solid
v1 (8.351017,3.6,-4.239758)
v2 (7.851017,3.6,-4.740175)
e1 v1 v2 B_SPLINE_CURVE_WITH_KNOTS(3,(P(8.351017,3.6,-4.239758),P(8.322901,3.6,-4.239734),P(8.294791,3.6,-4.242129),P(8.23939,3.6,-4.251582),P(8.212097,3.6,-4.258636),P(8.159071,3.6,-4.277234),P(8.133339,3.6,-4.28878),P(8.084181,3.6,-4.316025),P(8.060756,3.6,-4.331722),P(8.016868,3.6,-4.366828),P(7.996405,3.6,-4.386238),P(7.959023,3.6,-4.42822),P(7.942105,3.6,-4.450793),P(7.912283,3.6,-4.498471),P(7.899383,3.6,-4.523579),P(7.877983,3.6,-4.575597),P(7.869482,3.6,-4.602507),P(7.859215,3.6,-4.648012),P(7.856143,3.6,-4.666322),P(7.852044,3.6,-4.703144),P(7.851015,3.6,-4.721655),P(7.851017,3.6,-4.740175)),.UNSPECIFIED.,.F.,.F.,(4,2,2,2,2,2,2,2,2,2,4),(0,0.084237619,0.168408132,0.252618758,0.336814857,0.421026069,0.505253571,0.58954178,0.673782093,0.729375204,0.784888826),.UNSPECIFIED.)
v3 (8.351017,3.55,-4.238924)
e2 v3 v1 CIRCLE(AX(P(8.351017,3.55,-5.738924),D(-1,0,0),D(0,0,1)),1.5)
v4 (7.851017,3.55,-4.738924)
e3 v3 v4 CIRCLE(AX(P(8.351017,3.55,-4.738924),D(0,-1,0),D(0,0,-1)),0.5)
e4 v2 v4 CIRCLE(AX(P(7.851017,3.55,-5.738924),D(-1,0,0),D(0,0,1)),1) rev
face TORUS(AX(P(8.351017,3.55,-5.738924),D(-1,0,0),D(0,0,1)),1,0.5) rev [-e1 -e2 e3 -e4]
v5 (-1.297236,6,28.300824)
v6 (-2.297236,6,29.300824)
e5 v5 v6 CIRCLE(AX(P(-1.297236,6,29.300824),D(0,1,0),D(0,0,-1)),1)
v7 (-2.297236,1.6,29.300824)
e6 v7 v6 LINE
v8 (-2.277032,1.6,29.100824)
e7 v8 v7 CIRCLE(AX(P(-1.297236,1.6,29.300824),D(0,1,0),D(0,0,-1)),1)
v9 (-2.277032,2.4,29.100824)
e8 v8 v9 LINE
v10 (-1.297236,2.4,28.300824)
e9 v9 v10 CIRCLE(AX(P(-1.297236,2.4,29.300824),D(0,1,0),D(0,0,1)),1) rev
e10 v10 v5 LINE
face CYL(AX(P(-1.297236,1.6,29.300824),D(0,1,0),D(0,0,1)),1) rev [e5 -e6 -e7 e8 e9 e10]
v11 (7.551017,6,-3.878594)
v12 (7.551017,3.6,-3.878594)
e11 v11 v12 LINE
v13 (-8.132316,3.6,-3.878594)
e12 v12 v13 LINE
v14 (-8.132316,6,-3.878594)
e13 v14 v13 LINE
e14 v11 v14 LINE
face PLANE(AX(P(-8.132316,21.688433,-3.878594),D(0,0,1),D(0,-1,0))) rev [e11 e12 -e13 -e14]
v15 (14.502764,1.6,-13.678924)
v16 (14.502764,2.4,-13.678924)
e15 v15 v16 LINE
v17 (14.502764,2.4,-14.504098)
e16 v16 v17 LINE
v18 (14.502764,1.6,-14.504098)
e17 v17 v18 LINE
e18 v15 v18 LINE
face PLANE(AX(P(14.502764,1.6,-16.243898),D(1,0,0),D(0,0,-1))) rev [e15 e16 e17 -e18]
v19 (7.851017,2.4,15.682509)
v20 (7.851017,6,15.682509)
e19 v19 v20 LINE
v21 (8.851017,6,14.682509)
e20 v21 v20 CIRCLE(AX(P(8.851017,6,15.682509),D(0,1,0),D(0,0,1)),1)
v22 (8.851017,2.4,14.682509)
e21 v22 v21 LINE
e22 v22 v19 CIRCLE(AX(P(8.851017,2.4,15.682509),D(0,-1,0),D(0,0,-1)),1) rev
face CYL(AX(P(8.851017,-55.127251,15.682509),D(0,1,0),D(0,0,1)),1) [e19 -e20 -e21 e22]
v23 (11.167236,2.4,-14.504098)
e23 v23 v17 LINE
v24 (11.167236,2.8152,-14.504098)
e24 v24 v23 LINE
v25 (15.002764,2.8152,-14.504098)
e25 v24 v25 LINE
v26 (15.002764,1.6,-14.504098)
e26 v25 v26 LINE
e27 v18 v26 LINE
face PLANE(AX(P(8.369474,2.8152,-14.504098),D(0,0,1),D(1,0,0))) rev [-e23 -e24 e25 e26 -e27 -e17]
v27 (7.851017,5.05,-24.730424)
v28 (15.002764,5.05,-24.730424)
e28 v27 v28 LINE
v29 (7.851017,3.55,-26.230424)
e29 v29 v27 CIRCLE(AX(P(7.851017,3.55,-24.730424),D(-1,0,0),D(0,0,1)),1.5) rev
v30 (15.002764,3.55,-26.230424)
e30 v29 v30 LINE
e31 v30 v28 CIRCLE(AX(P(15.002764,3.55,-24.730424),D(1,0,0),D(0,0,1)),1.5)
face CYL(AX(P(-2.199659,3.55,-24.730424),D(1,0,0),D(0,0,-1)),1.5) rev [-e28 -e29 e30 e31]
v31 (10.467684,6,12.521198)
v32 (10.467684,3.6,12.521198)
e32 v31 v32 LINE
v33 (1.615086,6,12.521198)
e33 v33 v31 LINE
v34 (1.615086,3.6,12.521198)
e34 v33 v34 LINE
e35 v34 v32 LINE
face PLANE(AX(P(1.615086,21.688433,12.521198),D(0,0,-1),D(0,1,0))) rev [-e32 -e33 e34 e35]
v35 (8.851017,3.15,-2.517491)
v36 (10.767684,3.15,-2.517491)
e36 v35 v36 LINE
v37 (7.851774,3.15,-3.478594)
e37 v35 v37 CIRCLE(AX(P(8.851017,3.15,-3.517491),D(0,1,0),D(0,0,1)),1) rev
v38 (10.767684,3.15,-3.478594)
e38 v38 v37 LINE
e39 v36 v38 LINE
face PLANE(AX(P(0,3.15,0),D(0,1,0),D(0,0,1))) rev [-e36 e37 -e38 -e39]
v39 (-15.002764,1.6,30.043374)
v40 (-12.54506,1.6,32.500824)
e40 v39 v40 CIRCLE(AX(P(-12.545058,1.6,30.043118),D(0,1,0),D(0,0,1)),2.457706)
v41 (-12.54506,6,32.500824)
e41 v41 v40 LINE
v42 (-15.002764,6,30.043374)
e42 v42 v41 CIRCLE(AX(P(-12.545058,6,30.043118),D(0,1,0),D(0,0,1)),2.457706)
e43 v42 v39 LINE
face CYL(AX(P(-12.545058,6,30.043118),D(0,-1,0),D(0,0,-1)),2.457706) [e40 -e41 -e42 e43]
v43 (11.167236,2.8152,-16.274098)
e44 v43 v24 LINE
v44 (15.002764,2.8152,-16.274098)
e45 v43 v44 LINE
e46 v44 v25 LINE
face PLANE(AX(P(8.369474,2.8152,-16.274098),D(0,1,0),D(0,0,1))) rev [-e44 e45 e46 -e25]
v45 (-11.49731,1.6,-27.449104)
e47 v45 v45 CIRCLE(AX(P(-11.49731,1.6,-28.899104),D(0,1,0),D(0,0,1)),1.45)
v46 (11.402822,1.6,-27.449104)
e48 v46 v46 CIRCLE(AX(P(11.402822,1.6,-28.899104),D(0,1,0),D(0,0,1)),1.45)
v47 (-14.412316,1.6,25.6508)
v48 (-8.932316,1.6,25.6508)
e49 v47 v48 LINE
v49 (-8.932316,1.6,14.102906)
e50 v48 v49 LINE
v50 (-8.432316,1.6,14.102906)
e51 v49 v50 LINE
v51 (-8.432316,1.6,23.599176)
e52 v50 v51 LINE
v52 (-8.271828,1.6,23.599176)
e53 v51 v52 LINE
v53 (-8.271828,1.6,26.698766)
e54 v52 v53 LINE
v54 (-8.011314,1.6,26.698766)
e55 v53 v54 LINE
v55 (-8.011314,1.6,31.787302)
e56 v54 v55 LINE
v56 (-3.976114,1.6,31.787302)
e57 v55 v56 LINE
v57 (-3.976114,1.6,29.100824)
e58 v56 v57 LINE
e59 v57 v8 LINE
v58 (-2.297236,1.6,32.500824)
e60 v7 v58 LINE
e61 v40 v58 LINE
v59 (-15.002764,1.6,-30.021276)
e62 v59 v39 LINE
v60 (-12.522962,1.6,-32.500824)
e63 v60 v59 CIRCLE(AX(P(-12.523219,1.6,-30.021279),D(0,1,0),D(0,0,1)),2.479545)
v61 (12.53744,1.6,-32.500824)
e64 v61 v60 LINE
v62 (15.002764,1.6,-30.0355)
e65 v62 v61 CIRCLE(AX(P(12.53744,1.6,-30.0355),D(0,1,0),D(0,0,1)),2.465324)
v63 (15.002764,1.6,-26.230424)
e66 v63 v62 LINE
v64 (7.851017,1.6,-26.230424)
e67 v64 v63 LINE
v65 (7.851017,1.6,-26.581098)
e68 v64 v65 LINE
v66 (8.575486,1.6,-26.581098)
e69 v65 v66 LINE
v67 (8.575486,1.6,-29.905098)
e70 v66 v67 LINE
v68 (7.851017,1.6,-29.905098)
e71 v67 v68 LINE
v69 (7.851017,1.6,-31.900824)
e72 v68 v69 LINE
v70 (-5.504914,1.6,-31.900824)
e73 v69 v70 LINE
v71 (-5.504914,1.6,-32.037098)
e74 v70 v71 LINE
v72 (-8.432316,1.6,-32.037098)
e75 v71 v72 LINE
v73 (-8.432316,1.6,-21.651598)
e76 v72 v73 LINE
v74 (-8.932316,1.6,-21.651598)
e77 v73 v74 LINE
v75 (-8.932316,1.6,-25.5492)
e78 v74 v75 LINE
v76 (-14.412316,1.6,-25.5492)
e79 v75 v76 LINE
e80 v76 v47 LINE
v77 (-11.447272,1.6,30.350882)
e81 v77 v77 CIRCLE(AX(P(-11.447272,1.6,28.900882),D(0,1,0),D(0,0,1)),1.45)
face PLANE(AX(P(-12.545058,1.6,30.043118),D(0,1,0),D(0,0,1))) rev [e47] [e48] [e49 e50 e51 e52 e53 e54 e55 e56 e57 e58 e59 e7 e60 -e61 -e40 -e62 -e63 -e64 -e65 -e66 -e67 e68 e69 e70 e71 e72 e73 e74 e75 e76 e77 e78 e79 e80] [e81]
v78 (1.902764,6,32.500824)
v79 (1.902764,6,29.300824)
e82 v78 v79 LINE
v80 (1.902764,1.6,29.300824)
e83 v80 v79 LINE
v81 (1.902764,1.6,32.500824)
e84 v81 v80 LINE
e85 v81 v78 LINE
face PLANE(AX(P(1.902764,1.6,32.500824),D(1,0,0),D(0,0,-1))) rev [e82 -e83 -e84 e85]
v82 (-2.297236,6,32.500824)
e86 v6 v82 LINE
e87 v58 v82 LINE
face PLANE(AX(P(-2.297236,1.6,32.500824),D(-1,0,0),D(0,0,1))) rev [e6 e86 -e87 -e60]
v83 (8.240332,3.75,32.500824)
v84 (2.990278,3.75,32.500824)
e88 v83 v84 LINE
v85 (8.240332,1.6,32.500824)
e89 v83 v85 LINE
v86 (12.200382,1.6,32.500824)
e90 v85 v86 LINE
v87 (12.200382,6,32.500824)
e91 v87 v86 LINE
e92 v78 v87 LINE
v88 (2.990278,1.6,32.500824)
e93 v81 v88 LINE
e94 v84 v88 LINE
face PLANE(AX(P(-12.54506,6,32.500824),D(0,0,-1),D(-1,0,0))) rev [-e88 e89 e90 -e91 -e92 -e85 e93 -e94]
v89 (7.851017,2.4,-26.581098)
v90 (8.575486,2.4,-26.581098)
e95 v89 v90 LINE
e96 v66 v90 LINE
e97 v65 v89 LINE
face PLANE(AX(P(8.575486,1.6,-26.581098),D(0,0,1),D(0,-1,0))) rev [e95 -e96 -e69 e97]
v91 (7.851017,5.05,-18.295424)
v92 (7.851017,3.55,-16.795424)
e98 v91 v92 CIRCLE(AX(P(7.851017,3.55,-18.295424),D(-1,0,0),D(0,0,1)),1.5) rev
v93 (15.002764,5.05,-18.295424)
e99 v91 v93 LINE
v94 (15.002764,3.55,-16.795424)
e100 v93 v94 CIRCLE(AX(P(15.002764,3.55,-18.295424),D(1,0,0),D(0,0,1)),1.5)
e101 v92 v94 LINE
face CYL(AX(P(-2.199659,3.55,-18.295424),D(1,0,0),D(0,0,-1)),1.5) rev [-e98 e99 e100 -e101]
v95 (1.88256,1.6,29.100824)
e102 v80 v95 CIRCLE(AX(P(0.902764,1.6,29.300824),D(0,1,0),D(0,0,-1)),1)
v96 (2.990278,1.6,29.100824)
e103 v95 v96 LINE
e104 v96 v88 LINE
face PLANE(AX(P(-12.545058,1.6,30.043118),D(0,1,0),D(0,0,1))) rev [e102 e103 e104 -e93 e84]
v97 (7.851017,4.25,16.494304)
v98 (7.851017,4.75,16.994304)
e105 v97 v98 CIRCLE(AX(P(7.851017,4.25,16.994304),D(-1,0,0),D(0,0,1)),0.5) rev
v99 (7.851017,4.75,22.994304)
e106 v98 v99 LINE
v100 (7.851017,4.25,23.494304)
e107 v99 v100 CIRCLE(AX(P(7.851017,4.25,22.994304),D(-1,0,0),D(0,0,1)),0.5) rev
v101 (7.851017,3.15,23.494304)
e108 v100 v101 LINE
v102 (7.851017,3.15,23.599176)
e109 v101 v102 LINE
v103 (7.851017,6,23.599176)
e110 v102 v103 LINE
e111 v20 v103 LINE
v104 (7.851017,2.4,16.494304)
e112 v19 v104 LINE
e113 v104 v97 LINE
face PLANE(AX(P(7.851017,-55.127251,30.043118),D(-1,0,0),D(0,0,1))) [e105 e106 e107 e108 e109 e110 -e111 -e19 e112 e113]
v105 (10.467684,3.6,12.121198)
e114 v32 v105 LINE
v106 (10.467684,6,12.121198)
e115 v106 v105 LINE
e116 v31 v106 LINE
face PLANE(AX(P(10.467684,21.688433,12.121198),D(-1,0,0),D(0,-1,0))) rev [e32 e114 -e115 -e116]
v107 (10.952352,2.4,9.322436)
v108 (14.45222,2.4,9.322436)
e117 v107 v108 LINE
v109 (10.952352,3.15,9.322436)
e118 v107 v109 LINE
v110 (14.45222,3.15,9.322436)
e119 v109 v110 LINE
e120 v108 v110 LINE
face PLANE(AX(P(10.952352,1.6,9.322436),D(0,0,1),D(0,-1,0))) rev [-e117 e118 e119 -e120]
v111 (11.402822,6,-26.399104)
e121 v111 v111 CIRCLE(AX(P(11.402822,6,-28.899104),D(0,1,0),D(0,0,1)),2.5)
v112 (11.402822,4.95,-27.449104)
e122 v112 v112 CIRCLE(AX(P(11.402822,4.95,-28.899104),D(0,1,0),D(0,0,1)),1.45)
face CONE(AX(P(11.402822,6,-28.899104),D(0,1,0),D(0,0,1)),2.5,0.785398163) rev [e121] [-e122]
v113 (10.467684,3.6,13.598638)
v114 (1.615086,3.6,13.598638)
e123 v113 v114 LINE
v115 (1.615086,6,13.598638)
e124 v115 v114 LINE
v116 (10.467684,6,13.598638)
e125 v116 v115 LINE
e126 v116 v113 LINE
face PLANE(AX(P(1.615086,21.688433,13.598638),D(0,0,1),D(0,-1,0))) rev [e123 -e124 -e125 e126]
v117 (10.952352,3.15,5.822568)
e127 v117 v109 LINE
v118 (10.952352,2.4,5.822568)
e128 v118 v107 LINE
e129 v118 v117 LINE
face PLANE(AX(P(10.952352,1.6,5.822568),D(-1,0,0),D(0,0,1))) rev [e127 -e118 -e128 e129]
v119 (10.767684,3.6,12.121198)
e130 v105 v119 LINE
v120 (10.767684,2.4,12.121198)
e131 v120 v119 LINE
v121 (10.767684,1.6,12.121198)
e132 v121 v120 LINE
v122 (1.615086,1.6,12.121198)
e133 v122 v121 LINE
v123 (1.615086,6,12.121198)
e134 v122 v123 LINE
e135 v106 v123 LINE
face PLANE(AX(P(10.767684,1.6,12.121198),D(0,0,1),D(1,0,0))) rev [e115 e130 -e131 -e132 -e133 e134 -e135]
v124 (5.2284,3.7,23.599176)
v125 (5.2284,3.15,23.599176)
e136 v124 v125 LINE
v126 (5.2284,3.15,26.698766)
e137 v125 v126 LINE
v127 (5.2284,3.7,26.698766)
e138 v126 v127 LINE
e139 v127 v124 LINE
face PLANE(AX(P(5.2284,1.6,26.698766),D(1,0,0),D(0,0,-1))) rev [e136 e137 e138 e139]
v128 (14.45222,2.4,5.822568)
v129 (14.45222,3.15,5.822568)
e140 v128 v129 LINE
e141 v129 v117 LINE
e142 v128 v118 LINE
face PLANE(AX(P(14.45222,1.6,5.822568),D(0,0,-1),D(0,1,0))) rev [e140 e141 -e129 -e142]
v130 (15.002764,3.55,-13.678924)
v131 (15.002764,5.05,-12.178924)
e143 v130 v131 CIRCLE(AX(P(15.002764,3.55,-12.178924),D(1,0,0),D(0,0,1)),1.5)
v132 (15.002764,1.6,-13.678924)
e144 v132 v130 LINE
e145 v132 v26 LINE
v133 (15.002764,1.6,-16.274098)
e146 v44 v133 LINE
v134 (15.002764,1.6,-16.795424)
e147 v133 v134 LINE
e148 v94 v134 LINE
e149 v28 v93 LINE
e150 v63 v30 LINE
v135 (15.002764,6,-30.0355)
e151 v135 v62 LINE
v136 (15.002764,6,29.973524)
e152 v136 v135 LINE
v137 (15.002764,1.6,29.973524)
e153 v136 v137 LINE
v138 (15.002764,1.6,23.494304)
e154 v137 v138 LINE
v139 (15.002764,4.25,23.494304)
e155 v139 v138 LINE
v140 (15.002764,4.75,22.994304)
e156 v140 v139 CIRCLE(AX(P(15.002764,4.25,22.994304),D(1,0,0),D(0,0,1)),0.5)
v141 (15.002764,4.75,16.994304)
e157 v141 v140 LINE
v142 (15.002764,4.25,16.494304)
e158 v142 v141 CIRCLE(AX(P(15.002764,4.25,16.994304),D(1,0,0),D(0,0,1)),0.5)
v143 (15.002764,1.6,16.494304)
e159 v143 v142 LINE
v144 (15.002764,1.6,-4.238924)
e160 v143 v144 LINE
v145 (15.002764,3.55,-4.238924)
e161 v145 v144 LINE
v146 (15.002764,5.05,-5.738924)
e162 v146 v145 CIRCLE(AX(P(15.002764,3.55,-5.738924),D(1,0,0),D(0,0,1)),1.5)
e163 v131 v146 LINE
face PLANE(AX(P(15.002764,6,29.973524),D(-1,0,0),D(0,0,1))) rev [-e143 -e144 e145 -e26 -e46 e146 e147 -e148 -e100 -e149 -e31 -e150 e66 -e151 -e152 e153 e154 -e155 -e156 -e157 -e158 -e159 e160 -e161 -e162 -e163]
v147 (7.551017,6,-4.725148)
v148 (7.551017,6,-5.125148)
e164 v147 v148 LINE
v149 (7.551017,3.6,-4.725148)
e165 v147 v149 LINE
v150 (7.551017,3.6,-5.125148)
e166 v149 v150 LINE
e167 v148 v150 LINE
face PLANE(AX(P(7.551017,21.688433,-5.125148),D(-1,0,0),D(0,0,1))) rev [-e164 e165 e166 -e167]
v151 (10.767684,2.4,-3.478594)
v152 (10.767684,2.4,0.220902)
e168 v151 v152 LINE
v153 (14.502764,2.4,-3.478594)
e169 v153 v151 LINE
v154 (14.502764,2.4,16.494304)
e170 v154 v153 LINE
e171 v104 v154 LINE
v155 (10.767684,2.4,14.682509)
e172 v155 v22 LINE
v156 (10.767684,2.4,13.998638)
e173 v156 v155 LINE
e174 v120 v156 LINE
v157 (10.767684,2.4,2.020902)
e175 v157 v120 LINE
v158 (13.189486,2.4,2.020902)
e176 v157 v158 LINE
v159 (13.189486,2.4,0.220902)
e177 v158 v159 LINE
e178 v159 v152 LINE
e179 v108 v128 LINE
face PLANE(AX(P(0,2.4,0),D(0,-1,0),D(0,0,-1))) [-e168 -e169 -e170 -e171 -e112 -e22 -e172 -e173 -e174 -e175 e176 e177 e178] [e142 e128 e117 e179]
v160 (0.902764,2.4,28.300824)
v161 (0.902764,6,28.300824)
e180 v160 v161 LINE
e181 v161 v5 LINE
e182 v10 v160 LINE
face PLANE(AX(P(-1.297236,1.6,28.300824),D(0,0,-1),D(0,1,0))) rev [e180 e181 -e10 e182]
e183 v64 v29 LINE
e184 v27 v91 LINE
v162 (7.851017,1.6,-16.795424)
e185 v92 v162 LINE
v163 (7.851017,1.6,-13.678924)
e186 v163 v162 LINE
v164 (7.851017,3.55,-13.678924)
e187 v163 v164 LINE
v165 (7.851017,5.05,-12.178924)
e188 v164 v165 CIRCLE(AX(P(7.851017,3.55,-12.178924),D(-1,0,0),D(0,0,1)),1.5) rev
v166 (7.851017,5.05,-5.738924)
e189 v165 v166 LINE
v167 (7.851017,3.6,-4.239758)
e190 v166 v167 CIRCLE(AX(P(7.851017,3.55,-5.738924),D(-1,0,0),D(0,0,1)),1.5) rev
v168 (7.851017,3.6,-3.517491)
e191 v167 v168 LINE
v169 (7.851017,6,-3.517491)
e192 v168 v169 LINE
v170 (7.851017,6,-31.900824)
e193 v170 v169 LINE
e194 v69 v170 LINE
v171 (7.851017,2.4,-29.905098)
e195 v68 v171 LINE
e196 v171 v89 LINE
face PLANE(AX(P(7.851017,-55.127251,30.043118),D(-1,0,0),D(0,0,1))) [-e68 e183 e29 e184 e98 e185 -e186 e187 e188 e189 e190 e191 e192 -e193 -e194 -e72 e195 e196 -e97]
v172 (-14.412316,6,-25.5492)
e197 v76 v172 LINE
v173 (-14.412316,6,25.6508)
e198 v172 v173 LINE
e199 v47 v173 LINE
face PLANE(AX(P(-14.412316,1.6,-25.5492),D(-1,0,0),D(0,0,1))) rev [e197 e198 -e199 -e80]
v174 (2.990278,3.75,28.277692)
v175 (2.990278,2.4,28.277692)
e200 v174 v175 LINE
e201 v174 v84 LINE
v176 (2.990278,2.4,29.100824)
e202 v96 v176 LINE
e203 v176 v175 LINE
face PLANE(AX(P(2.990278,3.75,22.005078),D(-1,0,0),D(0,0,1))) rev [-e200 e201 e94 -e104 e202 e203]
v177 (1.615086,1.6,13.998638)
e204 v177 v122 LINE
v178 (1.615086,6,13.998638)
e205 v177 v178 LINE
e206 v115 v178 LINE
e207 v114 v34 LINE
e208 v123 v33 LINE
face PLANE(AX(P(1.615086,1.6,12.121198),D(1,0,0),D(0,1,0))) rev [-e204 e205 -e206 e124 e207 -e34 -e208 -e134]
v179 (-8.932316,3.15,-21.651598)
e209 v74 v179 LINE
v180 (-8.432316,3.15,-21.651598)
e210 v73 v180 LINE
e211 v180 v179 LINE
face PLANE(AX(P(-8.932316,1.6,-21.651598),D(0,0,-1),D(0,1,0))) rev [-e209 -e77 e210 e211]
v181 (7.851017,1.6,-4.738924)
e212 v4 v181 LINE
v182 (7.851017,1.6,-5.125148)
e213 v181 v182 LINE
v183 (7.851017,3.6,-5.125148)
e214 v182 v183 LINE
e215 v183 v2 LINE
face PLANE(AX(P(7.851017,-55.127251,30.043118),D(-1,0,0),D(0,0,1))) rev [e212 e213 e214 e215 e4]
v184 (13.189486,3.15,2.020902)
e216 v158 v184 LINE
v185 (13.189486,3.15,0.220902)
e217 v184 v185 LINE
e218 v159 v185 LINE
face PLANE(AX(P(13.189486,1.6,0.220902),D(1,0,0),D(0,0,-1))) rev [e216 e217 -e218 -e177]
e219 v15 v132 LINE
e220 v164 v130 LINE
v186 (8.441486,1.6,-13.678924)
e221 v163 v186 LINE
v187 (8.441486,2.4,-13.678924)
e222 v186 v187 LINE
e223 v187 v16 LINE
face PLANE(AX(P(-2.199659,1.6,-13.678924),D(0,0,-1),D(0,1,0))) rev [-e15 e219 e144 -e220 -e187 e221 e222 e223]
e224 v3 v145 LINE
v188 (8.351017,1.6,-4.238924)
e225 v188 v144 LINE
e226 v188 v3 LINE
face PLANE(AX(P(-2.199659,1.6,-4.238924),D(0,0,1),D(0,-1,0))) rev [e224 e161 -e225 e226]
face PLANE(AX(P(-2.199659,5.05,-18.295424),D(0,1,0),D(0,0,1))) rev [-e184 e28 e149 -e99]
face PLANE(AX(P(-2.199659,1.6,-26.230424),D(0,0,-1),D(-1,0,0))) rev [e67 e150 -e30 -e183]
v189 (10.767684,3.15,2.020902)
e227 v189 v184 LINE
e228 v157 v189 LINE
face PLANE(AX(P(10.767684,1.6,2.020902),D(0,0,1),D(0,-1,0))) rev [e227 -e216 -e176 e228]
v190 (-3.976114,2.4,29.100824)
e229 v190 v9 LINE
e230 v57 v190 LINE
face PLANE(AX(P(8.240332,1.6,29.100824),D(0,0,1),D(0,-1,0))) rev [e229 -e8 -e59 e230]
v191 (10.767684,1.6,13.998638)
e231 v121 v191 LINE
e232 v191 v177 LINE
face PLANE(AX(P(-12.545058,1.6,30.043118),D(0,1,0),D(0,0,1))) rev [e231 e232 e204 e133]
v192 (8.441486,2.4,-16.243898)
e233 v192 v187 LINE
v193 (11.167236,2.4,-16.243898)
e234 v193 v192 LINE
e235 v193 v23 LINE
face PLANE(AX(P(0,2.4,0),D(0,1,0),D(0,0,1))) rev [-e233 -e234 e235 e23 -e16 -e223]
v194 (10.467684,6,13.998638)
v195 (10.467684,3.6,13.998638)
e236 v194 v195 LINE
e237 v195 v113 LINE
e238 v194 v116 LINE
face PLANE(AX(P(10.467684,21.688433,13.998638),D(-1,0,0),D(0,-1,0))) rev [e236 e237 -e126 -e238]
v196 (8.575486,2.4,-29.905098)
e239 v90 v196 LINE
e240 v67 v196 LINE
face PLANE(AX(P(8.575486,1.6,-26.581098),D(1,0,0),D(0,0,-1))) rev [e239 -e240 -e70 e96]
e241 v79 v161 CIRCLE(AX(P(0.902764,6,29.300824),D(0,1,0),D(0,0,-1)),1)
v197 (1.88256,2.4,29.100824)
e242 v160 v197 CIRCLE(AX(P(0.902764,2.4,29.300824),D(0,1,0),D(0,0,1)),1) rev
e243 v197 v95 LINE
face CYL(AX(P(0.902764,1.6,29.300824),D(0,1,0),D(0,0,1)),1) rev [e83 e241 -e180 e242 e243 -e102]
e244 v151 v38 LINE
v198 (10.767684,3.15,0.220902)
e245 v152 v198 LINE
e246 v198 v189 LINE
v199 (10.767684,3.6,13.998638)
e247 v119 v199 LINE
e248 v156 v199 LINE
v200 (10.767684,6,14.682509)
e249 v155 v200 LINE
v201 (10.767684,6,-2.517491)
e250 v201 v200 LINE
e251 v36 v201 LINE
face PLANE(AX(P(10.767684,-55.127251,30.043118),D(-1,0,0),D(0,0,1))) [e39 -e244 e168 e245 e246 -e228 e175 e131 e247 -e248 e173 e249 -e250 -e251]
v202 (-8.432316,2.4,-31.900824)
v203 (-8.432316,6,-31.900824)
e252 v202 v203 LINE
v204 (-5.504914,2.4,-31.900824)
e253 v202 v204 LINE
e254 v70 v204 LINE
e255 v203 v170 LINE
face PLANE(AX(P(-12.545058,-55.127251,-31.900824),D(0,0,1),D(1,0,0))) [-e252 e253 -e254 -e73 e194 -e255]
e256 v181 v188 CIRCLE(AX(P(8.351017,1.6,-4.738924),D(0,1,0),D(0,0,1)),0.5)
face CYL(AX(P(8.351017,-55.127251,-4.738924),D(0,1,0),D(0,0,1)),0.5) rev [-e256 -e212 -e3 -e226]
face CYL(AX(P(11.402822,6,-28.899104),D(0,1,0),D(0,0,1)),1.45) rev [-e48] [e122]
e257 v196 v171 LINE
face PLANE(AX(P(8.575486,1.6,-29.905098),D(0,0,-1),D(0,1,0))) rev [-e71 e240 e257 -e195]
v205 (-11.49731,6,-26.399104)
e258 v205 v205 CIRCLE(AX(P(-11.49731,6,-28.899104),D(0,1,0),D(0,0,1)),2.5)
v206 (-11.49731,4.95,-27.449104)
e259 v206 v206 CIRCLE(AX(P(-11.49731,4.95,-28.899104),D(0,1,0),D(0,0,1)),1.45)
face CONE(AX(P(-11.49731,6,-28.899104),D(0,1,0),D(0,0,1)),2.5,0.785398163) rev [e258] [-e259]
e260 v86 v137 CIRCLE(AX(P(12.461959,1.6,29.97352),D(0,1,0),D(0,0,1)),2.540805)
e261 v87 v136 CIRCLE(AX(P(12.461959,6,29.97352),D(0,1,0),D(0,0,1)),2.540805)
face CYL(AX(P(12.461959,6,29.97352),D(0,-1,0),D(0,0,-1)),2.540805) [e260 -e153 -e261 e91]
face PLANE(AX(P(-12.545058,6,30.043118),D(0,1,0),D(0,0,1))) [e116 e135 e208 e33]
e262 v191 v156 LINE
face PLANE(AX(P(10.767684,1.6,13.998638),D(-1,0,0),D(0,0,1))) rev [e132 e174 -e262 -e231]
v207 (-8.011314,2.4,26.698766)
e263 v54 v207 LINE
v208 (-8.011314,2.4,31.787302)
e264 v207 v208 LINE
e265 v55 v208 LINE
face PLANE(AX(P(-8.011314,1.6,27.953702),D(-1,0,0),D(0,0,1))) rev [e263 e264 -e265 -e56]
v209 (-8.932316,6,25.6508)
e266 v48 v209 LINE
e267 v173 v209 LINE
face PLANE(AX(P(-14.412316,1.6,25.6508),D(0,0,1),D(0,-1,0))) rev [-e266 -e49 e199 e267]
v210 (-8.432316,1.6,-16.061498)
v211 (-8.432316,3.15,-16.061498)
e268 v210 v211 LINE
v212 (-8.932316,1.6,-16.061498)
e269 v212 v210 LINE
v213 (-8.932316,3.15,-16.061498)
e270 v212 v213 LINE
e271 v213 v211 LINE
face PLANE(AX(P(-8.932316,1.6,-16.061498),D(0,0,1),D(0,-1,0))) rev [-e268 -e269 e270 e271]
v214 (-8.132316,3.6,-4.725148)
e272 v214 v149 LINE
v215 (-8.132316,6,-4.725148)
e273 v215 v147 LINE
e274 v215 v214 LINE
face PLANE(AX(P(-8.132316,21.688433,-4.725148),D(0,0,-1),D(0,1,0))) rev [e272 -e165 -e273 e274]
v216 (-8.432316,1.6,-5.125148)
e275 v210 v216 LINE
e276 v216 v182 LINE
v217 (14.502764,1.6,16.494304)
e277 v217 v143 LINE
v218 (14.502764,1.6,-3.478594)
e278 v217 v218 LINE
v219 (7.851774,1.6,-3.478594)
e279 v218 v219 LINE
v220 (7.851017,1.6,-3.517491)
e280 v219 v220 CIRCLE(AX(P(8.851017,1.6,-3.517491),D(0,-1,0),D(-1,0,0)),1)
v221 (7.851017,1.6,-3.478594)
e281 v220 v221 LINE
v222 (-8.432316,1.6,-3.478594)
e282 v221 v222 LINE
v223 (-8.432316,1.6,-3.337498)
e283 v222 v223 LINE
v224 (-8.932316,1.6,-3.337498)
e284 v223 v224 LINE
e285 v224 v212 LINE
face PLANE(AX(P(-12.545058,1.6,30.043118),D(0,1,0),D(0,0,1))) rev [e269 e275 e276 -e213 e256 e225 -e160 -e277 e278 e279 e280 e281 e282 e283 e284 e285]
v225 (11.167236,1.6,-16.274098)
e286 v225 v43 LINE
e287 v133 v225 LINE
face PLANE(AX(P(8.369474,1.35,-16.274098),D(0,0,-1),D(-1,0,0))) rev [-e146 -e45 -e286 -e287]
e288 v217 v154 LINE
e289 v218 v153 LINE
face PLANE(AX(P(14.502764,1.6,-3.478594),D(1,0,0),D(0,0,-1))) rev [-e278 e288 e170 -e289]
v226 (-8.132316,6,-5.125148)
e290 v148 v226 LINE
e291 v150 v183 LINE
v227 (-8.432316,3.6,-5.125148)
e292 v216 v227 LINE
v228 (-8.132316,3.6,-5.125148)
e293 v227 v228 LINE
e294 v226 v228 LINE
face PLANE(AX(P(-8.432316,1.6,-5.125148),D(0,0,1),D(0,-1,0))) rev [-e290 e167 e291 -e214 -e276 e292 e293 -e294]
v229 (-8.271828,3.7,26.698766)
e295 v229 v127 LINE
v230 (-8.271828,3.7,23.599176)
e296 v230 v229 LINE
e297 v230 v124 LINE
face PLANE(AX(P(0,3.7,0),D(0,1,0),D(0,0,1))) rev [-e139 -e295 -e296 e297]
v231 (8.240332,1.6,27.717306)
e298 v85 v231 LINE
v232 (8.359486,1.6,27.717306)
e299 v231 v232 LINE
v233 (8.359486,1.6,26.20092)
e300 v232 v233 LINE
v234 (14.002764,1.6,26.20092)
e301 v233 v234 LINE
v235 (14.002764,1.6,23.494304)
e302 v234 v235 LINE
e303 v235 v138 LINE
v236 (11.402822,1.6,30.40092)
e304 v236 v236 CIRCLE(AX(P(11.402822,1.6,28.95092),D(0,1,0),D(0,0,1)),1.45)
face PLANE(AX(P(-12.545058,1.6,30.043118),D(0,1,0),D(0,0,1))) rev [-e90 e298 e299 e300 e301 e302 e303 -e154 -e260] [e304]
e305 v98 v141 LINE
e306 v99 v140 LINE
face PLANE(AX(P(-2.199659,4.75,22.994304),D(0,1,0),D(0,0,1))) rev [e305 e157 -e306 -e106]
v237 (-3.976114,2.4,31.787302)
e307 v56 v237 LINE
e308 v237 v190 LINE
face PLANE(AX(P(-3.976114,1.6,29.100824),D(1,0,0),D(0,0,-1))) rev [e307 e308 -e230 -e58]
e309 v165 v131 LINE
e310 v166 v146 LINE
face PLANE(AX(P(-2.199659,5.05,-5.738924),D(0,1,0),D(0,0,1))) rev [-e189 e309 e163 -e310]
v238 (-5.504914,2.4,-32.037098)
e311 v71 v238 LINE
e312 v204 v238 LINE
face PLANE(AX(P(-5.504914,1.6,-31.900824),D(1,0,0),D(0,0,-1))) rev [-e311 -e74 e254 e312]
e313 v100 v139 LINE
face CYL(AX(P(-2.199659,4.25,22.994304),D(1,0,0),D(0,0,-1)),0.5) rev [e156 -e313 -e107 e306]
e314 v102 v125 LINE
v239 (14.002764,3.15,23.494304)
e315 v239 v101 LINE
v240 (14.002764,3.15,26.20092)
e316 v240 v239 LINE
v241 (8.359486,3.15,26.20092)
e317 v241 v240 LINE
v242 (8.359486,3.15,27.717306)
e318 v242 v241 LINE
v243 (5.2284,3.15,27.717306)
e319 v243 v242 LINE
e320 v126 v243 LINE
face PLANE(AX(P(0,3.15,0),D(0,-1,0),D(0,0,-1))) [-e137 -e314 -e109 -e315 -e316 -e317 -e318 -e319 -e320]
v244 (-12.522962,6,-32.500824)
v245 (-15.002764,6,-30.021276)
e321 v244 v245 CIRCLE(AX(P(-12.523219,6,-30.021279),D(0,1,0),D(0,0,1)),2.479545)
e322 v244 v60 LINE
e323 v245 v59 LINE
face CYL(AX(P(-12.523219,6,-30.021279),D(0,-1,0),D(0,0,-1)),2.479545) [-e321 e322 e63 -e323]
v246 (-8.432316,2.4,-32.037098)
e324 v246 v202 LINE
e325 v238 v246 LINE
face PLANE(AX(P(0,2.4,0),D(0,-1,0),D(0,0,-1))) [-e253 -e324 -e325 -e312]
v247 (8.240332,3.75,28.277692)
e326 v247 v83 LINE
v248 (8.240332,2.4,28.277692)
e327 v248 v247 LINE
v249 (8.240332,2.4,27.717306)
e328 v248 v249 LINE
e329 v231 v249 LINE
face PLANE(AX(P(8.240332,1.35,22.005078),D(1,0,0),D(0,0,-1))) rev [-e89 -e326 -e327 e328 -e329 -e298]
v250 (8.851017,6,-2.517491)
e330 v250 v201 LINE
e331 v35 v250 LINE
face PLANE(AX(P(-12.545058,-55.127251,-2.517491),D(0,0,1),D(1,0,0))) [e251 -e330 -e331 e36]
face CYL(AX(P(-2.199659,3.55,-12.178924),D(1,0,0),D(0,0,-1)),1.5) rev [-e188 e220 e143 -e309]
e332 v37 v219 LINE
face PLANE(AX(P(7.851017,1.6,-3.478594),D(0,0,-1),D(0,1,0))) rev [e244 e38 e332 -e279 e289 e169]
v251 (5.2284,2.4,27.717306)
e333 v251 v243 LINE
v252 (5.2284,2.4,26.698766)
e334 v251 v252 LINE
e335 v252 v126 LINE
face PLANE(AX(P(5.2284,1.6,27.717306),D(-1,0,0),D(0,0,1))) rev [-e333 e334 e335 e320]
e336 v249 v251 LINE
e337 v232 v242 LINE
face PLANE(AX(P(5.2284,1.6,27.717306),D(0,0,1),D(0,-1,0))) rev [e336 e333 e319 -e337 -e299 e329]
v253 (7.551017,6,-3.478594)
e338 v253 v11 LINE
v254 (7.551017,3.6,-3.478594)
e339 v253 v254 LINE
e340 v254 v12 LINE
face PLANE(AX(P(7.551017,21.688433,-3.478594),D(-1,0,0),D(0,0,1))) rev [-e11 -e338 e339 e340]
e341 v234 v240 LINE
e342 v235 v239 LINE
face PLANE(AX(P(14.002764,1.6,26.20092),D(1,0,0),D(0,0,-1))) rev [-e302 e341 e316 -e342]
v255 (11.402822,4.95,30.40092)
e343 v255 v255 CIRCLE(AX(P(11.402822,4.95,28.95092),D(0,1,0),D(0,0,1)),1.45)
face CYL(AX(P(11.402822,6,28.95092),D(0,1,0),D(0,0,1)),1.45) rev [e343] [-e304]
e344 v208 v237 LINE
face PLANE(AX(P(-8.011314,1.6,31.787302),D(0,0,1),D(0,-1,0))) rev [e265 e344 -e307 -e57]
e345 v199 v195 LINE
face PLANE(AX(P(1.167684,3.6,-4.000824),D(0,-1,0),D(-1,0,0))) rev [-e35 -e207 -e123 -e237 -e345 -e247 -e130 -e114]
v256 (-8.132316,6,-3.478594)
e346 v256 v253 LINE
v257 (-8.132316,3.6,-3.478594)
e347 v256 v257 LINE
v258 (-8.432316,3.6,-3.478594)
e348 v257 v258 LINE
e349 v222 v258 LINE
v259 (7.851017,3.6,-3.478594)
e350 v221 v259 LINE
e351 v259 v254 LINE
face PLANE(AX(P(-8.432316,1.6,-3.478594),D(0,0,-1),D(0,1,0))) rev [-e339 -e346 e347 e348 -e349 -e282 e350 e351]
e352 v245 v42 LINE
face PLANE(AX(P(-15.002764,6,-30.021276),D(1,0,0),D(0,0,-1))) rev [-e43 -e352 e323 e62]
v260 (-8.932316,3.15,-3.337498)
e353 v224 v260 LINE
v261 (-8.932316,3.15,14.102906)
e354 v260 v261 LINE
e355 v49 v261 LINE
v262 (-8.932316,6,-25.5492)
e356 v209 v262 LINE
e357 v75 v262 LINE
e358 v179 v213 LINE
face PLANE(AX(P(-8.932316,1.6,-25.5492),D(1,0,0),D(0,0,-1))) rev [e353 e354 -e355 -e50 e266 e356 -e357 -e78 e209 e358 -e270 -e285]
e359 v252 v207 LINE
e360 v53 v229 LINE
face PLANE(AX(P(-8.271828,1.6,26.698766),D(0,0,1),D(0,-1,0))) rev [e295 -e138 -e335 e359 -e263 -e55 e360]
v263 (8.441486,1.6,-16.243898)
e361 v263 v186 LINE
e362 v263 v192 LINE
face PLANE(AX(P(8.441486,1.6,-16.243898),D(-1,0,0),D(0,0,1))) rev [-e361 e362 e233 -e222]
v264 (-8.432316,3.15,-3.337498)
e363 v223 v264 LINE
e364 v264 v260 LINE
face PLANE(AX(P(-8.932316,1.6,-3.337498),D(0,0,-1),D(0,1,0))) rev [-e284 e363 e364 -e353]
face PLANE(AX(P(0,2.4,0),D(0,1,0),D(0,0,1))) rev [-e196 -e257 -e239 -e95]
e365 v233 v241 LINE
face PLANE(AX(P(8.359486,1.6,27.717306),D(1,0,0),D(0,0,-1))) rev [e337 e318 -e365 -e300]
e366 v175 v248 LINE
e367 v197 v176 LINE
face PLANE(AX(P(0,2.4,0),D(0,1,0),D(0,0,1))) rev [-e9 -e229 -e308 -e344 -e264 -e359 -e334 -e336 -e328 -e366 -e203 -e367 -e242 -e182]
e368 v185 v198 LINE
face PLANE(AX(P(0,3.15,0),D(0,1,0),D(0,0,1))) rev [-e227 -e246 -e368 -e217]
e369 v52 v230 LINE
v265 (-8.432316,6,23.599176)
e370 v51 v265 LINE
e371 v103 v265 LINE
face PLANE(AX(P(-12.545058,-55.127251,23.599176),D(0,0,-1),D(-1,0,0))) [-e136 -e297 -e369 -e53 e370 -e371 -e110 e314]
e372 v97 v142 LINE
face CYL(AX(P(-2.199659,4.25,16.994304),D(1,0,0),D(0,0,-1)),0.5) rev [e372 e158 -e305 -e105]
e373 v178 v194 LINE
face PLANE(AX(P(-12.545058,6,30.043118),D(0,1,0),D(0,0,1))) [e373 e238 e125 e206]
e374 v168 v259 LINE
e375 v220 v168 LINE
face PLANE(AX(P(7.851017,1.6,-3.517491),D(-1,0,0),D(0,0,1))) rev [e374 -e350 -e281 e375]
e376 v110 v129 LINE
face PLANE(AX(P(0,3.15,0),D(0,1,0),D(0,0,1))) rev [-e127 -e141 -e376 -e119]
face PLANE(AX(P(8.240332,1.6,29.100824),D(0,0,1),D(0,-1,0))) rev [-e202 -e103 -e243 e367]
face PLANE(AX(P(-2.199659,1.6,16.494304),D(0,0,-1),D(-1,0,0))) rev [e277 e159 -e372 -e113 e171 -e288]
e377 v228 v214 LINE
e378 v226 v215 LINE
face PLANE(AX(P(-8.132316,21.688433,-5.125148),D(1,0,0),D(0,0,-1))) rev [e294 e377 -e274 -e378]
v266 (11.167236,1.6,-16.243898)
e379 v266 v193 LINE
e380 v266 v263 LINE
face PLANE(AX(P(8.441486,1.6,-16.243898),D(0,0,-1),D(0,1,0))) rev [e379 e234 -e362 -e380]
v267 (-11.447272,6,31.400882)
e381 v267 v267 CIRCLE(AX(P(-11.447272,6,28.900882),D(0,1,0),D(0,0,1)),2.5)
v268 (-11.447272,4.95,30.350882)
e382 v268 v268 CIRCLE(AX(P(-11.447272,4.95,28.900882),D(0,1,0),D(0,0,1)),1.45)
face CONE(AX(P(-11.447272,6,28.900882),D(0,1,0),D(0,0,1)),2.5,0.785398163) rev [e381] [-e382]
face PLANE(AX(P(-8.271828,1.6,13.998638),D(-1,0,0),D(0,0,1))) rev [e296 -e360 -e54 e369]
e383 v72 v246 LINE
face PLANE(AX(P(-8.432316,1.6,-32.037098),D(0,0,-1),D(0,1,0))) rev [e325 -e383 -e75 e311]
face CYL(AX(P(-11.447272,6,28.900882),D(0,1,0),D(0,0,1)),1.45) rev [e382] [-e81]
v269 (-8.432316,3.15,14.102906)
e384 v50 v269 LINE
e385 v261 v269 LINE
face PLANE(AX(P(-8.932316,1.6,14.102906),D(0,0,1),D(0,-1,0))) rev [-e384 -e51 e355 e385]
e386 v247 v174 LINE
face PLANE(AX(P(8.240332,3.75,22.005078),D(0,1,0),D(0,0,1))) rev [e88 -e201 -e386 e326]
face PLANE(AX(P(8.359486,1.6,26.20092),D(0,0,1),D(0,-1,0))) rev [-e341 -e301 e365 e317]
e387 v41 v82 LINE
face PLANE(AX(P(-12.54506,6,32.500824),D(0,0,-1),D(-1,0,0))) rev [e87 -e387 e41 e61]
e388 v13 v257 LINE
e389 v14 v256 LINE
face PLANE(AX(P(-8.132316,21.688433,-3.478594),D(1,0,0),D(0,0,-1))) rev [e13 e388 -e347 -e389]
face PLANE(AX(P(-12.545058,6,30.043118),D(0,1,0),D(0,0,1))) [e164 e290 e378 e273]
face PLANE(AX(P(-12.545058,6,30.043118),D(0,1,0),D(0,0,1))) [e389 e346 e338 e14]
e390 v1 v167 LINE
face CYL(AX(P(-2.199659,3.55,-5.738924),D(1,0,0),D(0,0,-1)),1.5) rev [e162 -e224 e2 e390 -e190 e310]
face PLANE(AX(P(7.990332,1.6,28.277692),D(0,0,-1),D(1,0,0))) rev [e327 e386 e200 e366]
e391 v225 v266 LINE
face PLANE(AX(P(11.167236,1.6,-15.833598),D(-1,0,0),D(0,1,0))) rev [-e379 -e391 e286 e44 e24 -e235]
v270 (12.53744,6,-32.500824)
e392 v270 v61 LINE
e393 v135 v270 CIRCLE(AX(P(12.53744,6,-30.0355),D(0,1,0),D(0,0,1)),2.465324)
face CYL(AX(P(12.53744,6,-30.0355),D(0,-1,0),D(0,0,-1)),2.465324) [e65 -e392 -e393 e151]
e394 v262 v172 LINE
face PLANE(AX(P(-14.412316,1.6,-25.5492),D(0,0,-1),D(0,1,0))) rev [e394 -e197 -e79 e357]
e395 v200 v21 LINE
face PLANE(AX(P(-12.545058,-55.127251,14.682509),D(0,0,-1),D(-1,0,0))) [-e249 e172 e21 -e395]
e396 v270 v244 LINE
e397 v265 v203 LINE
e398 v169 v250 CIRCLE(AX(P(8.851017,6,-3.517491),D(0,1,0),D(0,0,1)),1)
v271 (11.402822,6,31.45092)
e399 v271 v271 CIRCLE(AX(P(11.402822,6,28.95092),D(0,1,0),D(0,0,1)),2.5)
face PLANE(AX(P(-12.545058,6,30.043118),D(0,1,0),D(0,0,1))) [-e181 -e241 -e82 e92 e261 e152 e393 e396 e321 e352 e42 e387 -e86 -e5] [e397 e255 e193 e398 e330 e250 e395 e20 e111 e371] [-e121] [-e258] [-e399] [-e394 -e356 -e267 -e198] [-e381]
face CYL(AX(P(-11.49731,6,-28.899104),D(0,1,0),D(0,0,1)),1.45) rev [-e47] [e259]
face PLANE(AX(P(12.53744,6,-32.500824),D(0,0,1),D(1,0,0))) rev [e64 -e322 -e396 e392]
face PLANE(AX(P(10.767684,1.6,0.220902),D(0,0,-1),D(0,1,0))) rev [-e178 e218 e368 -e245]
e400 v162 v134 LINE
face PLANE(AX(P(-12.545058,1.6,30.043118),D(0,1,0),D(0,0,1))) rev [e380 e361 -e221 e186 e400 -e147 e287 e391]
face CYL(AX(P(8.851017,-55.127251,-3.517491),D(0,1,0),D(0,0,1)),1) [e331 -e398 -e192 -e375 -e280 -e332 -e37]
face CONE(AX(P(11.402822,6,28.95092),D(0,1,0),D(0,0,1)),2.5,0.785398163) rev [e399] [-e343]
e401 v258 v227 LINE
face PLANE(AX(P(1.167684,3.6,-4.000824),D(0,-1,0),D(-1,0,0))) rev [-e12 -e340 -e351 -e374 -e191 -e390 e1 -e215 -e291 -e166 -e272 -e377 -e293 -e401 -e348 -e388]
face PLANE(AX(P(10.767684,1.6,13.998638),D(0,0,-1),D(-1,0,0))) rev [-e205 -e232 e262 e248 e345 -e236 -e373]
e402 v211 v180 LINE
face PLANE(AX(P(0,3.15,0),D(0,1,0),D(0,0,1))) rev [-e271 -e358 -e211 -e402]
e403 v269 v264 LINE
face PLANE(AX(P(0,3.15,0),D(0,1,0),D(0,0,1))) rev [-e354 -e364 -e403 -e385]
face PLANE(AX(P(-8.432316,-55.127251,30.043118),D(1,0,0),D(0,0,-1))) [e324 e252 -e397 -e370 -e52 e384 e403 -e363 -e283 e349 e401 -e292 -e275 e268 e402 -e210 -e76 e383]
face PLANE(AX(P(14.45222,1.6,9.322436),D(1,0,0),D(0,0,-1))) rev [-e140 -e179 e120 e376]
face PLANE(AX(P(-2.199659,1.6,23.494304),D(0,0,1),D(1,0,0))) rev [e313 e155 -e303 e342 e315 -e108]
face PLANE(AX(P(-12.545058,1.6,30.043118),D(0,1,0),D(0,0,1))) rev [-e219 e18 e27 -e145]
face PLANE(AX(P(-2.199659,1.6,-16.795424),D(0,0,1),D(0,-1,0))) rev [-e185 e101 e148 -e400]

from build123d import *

# Parameters (mm, degrees)
BOSS_EXTRUDE1_DEPTH                                  = 4.4
CUT_EXTRUDE1_START                                   = 6
CUT_EXTRUDE1_DEPTH                                   = 2.4
CUT_EXTRUDE2_DEPTH                                   = 37.078029775
CUT_EXTRUDE2_DEPTH_BACK                              = 37.078029775
SKETCH3_W                                            = 5.48
SKETCH3_H                                            = 51.2
SKETCH10_W                                           = 16.283333333
SKETCH10_H                                           = 26.775676
CUT_EXTRUDE3_DEPTH                                   = 36.889054494
CUT_EXTRUDE4_DEPTH                                   = 7.151746667
CUT_EXTRUDE5_START                                   = 0.1
SKETCH12_W                                           = 13.500228
SKETCH12_H                                           = 12.700128
CUT_EXTRUDE5_DEPTH                                   = 36.989054494
CUT_EXTRUDE6_START                                   = 0.2
SKETCH13_W                                           = 0.5
SKETCH13_H                                           = 17.440404
SKETCH13_H_2                                         = 5.5901
SKETCH13_W_2                                         = 2.916666667
SKETCH13_H_3                                         = 0.961103333
SKETCH13_W_3                                         = 2.421802
SKETCH13_H_4                                         = 1.8
SKETCH13_W_4                                         = 3.499868
SKETCH13_H_5                                         = 3.499868
CUT_EXTRUDE6_DEPTH                                   = 37.138374093
SKETCH14_W                                           = 5.250054
SKETCH14_H                                           = 2.4
CUT_EXTRUDE7_DEPTH                                   = 4.223132
CUT_EXTRUDE8_DEPTH                                   = 37.078029775
CUT_EXTRUDE9_START                                   = 0.2
SKETCH16_W                                           = 2.927402
SKETCH16_H                                           = 0.136274
SKETCH16_W_2                                         = 0.724468667
SKETCH16_H_2                                         = 3.324
SKETCH16_W_3                                         = 6.061278
SKETCH16_H_3                                         = 2.564974001
CUT_EXTRUDE9_DEPTH                                   = 37.209779678
FILLET1_R                                            = 0.5
SKETCH17_W                                           = 1.77
SKETCH17_H                                           = 1.4652
CUT_EXTRUDE10_DEPTH                                  = 3.835528
SKETCH18_W                                           = 8.852598
SKETCH18_H                                           = 0.4
SKETCH18_W_2                                         = 15.683333333
BOSS_EXTRUDE2_DEPTH                                  = 2.4
CSK_FOR_M2_5_SLOTTED_RAISED_CTSK_HEAD_SC_D           = 2.9
CSK_FOR_M2_5_SLOTTED_RAISED_CTSK_HEAD_SC_CSINK_D     = 5
CSK_FOR_M2_5_SLOTTED_RAISED_CTSK_HEAD_SC_CSINK_ANGLE = 90


with BuildPart() as part:
    # Sketch1 → Boss-Extrude1 (new body)
    with BuildSketch(Plane(origin=(0, 1.6, 0), x_dir=(1, 0, 0), z_dir=(0, 1, 0))):
        with BuildLine():
            Line((-15.002764, 30.021276), (-15.002764, -30.043374))
            ThreePointArc((-15.002764, -30.043374), (-14.282828873, -31.781068474), (-12.54506, -32.500824))
            Line((-12.54506, -32.500824), (12.200382, -32.500824))
            ThreePointArc((12.200382, -32.500824), (14.163585126, -31.860357898), (15.002764, -29.973524))
            Line((15.002764, -29.973524), (15.002764, 30.0355))
            ThreePointArc((15.002764, 30.0355), (14.280687318, 31.778747318), (12.53744, 32.500824))
            Line((12.53744, 32.500824), (-12.522962, 32.500824))
            ThreePointArc((-12.522962, 32.500824), (-14.276432231, 31.77467184), (-15.002764, 30.021276))
        make_face()
    extrude(amount=BOSS_EXTRUDE1_DEPTH)

    # Sketch2 → Cut-Extrude1 (cut)
    with BuildSketch(Plane(origin=(0, 0, 0), x_dir=(1, 0, 0), z_dir=(0, 1, 0)).offset(CUT_EXTRUDE1_START)):
        with BuildLine():
            Line((-8.432316, 31.600824), (-8.432316, 31.900824))
            Line((-8.432316, 31.900824), (7.851017333, 31.900824))
            Line((7.851017333, 31.900824), (7.851017333, 31.600824))
            Line((7.851017333, 31.600824), (7.851017333, 3.517490667))
            ThreePointArc((7.851017333, 3.517490667), (8.143910552, 2.810383885), (8.851017333, 2.517490667))
            Line((8.851017333, 2.517490667), (10.767684, 2.517490667))
            Line((10.767684, 2.517490667), (10.767684, -14.682509333))
            Line((10.767684, -14.682509333), (8.851017333, -14.682509333))
            ThreePointArc((8.851017333, -14.682509333), (8.143910552, -14.975402552), (7.851017333, -15.682509333))
            Line((7.851017333, -15.682509333), (7.851017333, -23.599176))
            Line((7.851017333, -23.599176), (-8.432316, -23.599176))
            Line((-8.432316, -23.599176), (-8.432316, 31.600824))
        make_face()
    extrude(amount=-CUT_EXTRUDE1_DEPTH, mode=Mode.SUBTRACT)

    # Sketch3 → Cut-Extrude2 (cut, two sides: drawn at the far end of the back side and taken through both)
    with BuildSketch(Plane(origin=(0, 6, 0), x_dir=(1, 0, 0), z_dir=(0, 1, 0)).offset(-CUT_EXTRUDE2_DEPTH_BACK)):
        with Locations((-11.672316, -0.0508)):
            Rectangle(SKETCH3_W, SKETCH3_H)
    extrude(amount=CUT_EXTRUDE2_DEPTH + CUT_EXTRUDE2_DEPTH_BACK, mode=Mode.SUBTRACT)

    # Sketch10 → Cut-Extrude3 (cut, through all)
    with BuildSketch(Plane(origin=(0, 3.6, 0), x_dir=(1, 0, 0), z_dir=(0, 1, 0))):
        with Locations((-0.290649333, 18.512986)):
            Rectangle(SKETCH10_W, SKETCH10_H)
        with BuildLine():
            Line((-8.432316, 3.478594), (7.851017333, 3.478594))
            Line((7.851017333, 3.478594), (7.851017333, 3.517490667))
            ThreePointArc((7.851017333, 3.517490667), (8.143910552, 2.810383885), (8.851017333, 2.517490667))
            Line((8.851017333, 2.517490667), (10.767684, 2.517490667))
            Line((10.767684, 2.517490667), (10.767684, -12.121198))
            Line((10.767684, -12.121198), (1.615086, -12.121198))
            Line((1.615086, -12.121198), (1.615086, -13.998638))
            Line((1.615086, -13.998638), (10.767684, -13.998638))
            Line((10.767684, -13.998638), (10.767684, -14.682509333))
            Line((10.767684, -14.682509333), (8.851017333, -14.682509333))
            ThreePointArc((8.851017333, -14.682509333), (8.143910552, -14.975402552), (7.851017333, -15.682509333))
            Line((7.851017333, -15.682509333), (7.851017333, -23.599176))
            Line((7.851017333, -23.599176), (-8.432316, -23.599176))
            Line((-8.432316, -23.599176), (-8.432316, 3.478594))
        make_face()
    extrude(amount=-CUT_EXTRUDE3_DEPTH, mode=Mode.SUBTRACT)

    # Sketch11 → Cut-Extrude4 (cut)
    with BuildSketch(Plane(origin=(15.002764, 0, 0), x_dir=(0, 0, -1), z_dir=(1, 0, 0))):
        with BuildLine():
            Line((-23.494304, 1.6), (-16.494304, 1.6))
            Line((-16.494304, 1.6), (-16.494304, 4.25))
            ThreePointArc((-16.494304, 4.25), (-16.640750609, 4.603553391), (-16.994304, 4.75))
            Line((-16.994304, 4.75), (-22.994304, 4.75))
            ThreePointArc((-22.994304, 4.75), (-23.347857391, 4.603553391), (-23.494304, 4.25))
            Line((-23.494304, 4.25), (-23.494304, 1.6))
        make_face()
        with BuildLine():
            Line((4.238924, 1.6), (13.678923999, 1.6))
            Line((13.678923999, 1.6), (13.678923999, 3.55))
            ThreePointArc((13.678923999, 3.55), (13.239584171, 4.610660172), (12.178923999, 5.05))
            Line((12.178923999, 5.05), (5.738924, 5.05))
            ThreePointArc((5.738924, 5.05), (4.678263828, 4.610660172), (4.238924, 3.55))
            Line((4.238924, 3.55), (4.238924, 1.6))
        make_face()
        with BuildLine():
            Line((16.795424, 1.6), (26.230423999, 1.6))
            Line((26.230423999, 1.6), (26.230423999, 3.55))
            ThreePointArc((26.230423999, 3.55), (25.791084171, 4.610660172), (24.730423999, 5.05))
            Line((24.730423999, 5.05), (18.295424, 5.05))
            ThreePointArc((18.295424, 5.05), (17.234763828, 4.610660172), (16.795424, 3.55))
            Line((16.795424, 3.55), (16.795424, 1.6))
        make_face()
    extrude(amount=-CUT_EXTRUDE4_DEPTH, mode=Mode.SUBTRACT)

    # Sketch12 → Cut-Extrude5 (cut, through all)
    with BuildSketch(Plane(origin=(0, 3.6, 0), x_dir=(1, 0, 0), z_dir=(0, 1, 0)).offset(CUT_EXTRUDE5_START)):
        with Locations((-1.521714, -20.348702)):
            Rectangle(SKETCH12_W, SKETCH12_H)
    extrude(amount=-CUT_EXTRUDE5_DEPTH, mode=Mode.SUBTRACT)

    # Sketch13 → Cut-Extrude6 (cut, through all)
    with BuildSketch(Plane(origin=(0, 2.95, 0), x_dir=(1, 0, 0), z_dir=(0, 1, 0)).offset(CUT_EXTRUDE6_START)):
        with Locations((-8.682316, -5.382704)):
            Rectangle(SKETCH13_W, SKETCH13_H)
        Polygon((8.359486, -27.717306), (8.359486, -26.20092), (14.002764, -26.20092), (14.002764, -23.494304), (8.359486, -23.494304), (5.2284, -23.494304), (5.2284, -27.717306), align=None)
        with Locations((-8.682316, 18.856548)):
            Rectangle(SKETCH13_W, SKETCH13_H_2)
        with Locations((9.309350667, 2.998042333)):
            Rectangle(SKETCH13_W_2, SKETCH13_H_3)
        with Locations((11.978585, -1.120902)):
            Rectangle(SKETCH13_W_3, SKETCH13_H_4)
        with Locations((12.702286, -7.572502)):
            Rectangle(SKETCH13_W_4, SKETCH13_H_5)
    extrude(amount=-CUT_EXTRUDE6_DEPTH, mode=Mode.SUBTRACT)

    # Sketch14 → Cut-Extrude7 (cut)
    with BuildSketch(Plane.XY.offset(32.500824)):
        with Locations((5.615305, 2.55)):
            Rectangle(SKETCH14_W, SKETCH14_H)
    extrude(amount=-CUT_EXTRUDE7_DEPTH, mode=Mode.SUBTRACT)

    # Sketch15 → Cut-Extrude8 (cut, through all)
    with BuildSketch(Plane(origin=(0, 6, 0), x_dir=(1, 0, 0), z_dir=(0, 1, 0))):
        with BuildLine():
            Line((-2.297236, -32.500824), (1.902764, -32.500824))
            Line((1.902764, -32.500824), (1.902764, -29.300824))
            ThreePointArc((1.902764, -29.300824), (1.609870781, -28.593717219), (0.902764, -28.300824))
            Line((0.902764, -28.300824), (-1.297236, -28.300824))
            ThreePointArc((-1.297236, -28.300824), (-2.004342781, -28.593717219), (-2.297236, -29.300824))
            Line((-2.297236, -29.300824), (-2.297236, -32.500824))
        make_face()
    extrude(amount=-CUT_EXTRUDE8_DEPTH, mode=Mode.SUBTRACT)

    # Sketch16 → Cut-Extrude9 (cut, through all)
    with BuildSketch(Plane(origin=(0, 2.2, 0), x_dir=(1, 0, 0), z_dir=(0, 1, 0)).offset(CUT_EXTRUDE9_START)):
        with Locations((-6.968615, 31.968961)):
            Rectangle(SKETCH16_W, SKETCH16_H)
        Polygon((-8.011314, -27.953702), (-8.011314, -26.698766), (8.240332, -26.698766), (8.240332, -29.100824), (-3.976114, -29.100824), (-3.976114, -31.787302), (-8.011314, -31.787302), align=None)
        with Locations((8.213251666, 28.243098)):
            Rectangle(SKETCH16_W_2, SKETCH16_H_2)
        with Locations((11.472125, 14.961410999)):
            Rectangle(SKETCH16_W_3, SKETCH16_H_3)
        Polygon((7.851017333, 3.478594), (14.502764, 3.478594), (14.502764, -16.494304), (7.851017333, -16.494304), (7.851017333, -13.998638), (10.767684, -13.998638), (10.767684, -12.121198), (7.851017333, -12.121198), align=None)
    extrude(amount=-CUT_EXTRUDE9_DEPTH, mode=Mode.SUBTRACT)

    # Fillet1
    # the kernel refuses this fillet: 0.5 mm, written as the material it adds along each edge
    with BuildSketch(Plane(origin=(7.851017333, 3.55, -5.738924), x_dir=(0, 0.762179368611119, 0.6473659012209063), z_dir=(0, 0.6473659012209063, -0.762179368611119))) as fillet1_piece_1_section:
        with BuildLine():
            CenterArc((1.5 - FILLET1_R, FILLET1_R), FILLET1_R, 270, 90)
            Line((1.5, FILLET1_R), (1.5, 0))
            Line((1.5, 0), (1.5 - FILLET1_R, 0))
        make_face()
    fillet1_piece_1 = revolve(axis=Axis((7.851017333, 3.55, -5.738924), (1, 0, 0)), revolution_arc=49.656704737, mode=Mode.PRIVATE)
    fillet1_piece_1 = split(fillet1_piece_1, bisect_by=Plane(origin=(7.962700871, 3.6, -4.350907081), z_dir=(0, -1, 0)), keep=Keep.TOP, mode=Mode.PRIVATE)
    add(fillet1_piece_1)
    with BuildSketch(Plane(origin=(7.851017333, 3.55, -4.238924), x_dir=(1, 0, 0), z_dir=(0, -1, 0))) as fillet1_piece_2:
        with BuildLine():
            CenterArc((FILLET1_R, -FILLET1_R), FILLET1_R, 90, 90)
            Line((0, -FILLET1_R), (0, 0))
            Line((0, 0), (FILLET1_R, 0))
        make_face()
    extrude(amount=1.95)

    # Sketch17 → Cut-Extrude10 (cut)
    with BuildSketch(Plane(origin=(15.002764, 0, 0), x_dir=(0, 0, -1), z_dir=(1, 0, 0))):
        with Locations((15.389098, 2.0826)):
            Rectangle(SKETCH17_W, SKETCH17_H)
    extrude(amount=-CUT_EXTRUDE10_DEPTH, mode=Mode.SUBTRACT)

    # Sketch18 → Boss-Extrude2 (add)
    with BuildSketch(Plane(origin=(0, 3.6, 0), x_dir=(1, 0, 0), z_dir=(0, 1, 0))):
        with Locations((6.041385, -12.321198)):
            Rectangle(SKETCH18_W, SKETCH18_H)
        with Locations((6.041385, -13.798638)):
            Rectangle(SKETCH18_W, SKETCH18_H)
        with Locations((-0.290649334, 4.925148)):
            Rectangle(SKETCH18_W_2, SKETCH18_H)
        with Locations((-0.290649334, 3.678594)):
            Rectangle(SKETCH18_W_2, SKETCH18_H)
    extrude(amount=BOSS_EXTRUDE2_DEPTH)

    # CSK for M2.5 Slotted raised CTSK head screws1 (through all)
    with Locations(Plane(origin=(0, 6, 0), x_dir=(1, 0, 0), z_dir=(0, 1, 0))):
        with Locations((-11.49731, 28.899104), (11.402822, 28.899104), (-11.447272, -28.900882), (11.402822, -28.95092)):
            CounterSinkHole(CSK_FOR_M2_5_SLOTTED_RAISED_CTSK_HEAD_SC_D / 2, CSK_FOR_M2_5_SLOTTED_RAISED_CTSK_HEAD_SC_CSINK_D / 2, counter_sink_angle=CSK_FOR_M2_5_SLOTTED_RAISED_CTSK_HEAD_SC_CSINK_ANGLE)


solid = part.part
